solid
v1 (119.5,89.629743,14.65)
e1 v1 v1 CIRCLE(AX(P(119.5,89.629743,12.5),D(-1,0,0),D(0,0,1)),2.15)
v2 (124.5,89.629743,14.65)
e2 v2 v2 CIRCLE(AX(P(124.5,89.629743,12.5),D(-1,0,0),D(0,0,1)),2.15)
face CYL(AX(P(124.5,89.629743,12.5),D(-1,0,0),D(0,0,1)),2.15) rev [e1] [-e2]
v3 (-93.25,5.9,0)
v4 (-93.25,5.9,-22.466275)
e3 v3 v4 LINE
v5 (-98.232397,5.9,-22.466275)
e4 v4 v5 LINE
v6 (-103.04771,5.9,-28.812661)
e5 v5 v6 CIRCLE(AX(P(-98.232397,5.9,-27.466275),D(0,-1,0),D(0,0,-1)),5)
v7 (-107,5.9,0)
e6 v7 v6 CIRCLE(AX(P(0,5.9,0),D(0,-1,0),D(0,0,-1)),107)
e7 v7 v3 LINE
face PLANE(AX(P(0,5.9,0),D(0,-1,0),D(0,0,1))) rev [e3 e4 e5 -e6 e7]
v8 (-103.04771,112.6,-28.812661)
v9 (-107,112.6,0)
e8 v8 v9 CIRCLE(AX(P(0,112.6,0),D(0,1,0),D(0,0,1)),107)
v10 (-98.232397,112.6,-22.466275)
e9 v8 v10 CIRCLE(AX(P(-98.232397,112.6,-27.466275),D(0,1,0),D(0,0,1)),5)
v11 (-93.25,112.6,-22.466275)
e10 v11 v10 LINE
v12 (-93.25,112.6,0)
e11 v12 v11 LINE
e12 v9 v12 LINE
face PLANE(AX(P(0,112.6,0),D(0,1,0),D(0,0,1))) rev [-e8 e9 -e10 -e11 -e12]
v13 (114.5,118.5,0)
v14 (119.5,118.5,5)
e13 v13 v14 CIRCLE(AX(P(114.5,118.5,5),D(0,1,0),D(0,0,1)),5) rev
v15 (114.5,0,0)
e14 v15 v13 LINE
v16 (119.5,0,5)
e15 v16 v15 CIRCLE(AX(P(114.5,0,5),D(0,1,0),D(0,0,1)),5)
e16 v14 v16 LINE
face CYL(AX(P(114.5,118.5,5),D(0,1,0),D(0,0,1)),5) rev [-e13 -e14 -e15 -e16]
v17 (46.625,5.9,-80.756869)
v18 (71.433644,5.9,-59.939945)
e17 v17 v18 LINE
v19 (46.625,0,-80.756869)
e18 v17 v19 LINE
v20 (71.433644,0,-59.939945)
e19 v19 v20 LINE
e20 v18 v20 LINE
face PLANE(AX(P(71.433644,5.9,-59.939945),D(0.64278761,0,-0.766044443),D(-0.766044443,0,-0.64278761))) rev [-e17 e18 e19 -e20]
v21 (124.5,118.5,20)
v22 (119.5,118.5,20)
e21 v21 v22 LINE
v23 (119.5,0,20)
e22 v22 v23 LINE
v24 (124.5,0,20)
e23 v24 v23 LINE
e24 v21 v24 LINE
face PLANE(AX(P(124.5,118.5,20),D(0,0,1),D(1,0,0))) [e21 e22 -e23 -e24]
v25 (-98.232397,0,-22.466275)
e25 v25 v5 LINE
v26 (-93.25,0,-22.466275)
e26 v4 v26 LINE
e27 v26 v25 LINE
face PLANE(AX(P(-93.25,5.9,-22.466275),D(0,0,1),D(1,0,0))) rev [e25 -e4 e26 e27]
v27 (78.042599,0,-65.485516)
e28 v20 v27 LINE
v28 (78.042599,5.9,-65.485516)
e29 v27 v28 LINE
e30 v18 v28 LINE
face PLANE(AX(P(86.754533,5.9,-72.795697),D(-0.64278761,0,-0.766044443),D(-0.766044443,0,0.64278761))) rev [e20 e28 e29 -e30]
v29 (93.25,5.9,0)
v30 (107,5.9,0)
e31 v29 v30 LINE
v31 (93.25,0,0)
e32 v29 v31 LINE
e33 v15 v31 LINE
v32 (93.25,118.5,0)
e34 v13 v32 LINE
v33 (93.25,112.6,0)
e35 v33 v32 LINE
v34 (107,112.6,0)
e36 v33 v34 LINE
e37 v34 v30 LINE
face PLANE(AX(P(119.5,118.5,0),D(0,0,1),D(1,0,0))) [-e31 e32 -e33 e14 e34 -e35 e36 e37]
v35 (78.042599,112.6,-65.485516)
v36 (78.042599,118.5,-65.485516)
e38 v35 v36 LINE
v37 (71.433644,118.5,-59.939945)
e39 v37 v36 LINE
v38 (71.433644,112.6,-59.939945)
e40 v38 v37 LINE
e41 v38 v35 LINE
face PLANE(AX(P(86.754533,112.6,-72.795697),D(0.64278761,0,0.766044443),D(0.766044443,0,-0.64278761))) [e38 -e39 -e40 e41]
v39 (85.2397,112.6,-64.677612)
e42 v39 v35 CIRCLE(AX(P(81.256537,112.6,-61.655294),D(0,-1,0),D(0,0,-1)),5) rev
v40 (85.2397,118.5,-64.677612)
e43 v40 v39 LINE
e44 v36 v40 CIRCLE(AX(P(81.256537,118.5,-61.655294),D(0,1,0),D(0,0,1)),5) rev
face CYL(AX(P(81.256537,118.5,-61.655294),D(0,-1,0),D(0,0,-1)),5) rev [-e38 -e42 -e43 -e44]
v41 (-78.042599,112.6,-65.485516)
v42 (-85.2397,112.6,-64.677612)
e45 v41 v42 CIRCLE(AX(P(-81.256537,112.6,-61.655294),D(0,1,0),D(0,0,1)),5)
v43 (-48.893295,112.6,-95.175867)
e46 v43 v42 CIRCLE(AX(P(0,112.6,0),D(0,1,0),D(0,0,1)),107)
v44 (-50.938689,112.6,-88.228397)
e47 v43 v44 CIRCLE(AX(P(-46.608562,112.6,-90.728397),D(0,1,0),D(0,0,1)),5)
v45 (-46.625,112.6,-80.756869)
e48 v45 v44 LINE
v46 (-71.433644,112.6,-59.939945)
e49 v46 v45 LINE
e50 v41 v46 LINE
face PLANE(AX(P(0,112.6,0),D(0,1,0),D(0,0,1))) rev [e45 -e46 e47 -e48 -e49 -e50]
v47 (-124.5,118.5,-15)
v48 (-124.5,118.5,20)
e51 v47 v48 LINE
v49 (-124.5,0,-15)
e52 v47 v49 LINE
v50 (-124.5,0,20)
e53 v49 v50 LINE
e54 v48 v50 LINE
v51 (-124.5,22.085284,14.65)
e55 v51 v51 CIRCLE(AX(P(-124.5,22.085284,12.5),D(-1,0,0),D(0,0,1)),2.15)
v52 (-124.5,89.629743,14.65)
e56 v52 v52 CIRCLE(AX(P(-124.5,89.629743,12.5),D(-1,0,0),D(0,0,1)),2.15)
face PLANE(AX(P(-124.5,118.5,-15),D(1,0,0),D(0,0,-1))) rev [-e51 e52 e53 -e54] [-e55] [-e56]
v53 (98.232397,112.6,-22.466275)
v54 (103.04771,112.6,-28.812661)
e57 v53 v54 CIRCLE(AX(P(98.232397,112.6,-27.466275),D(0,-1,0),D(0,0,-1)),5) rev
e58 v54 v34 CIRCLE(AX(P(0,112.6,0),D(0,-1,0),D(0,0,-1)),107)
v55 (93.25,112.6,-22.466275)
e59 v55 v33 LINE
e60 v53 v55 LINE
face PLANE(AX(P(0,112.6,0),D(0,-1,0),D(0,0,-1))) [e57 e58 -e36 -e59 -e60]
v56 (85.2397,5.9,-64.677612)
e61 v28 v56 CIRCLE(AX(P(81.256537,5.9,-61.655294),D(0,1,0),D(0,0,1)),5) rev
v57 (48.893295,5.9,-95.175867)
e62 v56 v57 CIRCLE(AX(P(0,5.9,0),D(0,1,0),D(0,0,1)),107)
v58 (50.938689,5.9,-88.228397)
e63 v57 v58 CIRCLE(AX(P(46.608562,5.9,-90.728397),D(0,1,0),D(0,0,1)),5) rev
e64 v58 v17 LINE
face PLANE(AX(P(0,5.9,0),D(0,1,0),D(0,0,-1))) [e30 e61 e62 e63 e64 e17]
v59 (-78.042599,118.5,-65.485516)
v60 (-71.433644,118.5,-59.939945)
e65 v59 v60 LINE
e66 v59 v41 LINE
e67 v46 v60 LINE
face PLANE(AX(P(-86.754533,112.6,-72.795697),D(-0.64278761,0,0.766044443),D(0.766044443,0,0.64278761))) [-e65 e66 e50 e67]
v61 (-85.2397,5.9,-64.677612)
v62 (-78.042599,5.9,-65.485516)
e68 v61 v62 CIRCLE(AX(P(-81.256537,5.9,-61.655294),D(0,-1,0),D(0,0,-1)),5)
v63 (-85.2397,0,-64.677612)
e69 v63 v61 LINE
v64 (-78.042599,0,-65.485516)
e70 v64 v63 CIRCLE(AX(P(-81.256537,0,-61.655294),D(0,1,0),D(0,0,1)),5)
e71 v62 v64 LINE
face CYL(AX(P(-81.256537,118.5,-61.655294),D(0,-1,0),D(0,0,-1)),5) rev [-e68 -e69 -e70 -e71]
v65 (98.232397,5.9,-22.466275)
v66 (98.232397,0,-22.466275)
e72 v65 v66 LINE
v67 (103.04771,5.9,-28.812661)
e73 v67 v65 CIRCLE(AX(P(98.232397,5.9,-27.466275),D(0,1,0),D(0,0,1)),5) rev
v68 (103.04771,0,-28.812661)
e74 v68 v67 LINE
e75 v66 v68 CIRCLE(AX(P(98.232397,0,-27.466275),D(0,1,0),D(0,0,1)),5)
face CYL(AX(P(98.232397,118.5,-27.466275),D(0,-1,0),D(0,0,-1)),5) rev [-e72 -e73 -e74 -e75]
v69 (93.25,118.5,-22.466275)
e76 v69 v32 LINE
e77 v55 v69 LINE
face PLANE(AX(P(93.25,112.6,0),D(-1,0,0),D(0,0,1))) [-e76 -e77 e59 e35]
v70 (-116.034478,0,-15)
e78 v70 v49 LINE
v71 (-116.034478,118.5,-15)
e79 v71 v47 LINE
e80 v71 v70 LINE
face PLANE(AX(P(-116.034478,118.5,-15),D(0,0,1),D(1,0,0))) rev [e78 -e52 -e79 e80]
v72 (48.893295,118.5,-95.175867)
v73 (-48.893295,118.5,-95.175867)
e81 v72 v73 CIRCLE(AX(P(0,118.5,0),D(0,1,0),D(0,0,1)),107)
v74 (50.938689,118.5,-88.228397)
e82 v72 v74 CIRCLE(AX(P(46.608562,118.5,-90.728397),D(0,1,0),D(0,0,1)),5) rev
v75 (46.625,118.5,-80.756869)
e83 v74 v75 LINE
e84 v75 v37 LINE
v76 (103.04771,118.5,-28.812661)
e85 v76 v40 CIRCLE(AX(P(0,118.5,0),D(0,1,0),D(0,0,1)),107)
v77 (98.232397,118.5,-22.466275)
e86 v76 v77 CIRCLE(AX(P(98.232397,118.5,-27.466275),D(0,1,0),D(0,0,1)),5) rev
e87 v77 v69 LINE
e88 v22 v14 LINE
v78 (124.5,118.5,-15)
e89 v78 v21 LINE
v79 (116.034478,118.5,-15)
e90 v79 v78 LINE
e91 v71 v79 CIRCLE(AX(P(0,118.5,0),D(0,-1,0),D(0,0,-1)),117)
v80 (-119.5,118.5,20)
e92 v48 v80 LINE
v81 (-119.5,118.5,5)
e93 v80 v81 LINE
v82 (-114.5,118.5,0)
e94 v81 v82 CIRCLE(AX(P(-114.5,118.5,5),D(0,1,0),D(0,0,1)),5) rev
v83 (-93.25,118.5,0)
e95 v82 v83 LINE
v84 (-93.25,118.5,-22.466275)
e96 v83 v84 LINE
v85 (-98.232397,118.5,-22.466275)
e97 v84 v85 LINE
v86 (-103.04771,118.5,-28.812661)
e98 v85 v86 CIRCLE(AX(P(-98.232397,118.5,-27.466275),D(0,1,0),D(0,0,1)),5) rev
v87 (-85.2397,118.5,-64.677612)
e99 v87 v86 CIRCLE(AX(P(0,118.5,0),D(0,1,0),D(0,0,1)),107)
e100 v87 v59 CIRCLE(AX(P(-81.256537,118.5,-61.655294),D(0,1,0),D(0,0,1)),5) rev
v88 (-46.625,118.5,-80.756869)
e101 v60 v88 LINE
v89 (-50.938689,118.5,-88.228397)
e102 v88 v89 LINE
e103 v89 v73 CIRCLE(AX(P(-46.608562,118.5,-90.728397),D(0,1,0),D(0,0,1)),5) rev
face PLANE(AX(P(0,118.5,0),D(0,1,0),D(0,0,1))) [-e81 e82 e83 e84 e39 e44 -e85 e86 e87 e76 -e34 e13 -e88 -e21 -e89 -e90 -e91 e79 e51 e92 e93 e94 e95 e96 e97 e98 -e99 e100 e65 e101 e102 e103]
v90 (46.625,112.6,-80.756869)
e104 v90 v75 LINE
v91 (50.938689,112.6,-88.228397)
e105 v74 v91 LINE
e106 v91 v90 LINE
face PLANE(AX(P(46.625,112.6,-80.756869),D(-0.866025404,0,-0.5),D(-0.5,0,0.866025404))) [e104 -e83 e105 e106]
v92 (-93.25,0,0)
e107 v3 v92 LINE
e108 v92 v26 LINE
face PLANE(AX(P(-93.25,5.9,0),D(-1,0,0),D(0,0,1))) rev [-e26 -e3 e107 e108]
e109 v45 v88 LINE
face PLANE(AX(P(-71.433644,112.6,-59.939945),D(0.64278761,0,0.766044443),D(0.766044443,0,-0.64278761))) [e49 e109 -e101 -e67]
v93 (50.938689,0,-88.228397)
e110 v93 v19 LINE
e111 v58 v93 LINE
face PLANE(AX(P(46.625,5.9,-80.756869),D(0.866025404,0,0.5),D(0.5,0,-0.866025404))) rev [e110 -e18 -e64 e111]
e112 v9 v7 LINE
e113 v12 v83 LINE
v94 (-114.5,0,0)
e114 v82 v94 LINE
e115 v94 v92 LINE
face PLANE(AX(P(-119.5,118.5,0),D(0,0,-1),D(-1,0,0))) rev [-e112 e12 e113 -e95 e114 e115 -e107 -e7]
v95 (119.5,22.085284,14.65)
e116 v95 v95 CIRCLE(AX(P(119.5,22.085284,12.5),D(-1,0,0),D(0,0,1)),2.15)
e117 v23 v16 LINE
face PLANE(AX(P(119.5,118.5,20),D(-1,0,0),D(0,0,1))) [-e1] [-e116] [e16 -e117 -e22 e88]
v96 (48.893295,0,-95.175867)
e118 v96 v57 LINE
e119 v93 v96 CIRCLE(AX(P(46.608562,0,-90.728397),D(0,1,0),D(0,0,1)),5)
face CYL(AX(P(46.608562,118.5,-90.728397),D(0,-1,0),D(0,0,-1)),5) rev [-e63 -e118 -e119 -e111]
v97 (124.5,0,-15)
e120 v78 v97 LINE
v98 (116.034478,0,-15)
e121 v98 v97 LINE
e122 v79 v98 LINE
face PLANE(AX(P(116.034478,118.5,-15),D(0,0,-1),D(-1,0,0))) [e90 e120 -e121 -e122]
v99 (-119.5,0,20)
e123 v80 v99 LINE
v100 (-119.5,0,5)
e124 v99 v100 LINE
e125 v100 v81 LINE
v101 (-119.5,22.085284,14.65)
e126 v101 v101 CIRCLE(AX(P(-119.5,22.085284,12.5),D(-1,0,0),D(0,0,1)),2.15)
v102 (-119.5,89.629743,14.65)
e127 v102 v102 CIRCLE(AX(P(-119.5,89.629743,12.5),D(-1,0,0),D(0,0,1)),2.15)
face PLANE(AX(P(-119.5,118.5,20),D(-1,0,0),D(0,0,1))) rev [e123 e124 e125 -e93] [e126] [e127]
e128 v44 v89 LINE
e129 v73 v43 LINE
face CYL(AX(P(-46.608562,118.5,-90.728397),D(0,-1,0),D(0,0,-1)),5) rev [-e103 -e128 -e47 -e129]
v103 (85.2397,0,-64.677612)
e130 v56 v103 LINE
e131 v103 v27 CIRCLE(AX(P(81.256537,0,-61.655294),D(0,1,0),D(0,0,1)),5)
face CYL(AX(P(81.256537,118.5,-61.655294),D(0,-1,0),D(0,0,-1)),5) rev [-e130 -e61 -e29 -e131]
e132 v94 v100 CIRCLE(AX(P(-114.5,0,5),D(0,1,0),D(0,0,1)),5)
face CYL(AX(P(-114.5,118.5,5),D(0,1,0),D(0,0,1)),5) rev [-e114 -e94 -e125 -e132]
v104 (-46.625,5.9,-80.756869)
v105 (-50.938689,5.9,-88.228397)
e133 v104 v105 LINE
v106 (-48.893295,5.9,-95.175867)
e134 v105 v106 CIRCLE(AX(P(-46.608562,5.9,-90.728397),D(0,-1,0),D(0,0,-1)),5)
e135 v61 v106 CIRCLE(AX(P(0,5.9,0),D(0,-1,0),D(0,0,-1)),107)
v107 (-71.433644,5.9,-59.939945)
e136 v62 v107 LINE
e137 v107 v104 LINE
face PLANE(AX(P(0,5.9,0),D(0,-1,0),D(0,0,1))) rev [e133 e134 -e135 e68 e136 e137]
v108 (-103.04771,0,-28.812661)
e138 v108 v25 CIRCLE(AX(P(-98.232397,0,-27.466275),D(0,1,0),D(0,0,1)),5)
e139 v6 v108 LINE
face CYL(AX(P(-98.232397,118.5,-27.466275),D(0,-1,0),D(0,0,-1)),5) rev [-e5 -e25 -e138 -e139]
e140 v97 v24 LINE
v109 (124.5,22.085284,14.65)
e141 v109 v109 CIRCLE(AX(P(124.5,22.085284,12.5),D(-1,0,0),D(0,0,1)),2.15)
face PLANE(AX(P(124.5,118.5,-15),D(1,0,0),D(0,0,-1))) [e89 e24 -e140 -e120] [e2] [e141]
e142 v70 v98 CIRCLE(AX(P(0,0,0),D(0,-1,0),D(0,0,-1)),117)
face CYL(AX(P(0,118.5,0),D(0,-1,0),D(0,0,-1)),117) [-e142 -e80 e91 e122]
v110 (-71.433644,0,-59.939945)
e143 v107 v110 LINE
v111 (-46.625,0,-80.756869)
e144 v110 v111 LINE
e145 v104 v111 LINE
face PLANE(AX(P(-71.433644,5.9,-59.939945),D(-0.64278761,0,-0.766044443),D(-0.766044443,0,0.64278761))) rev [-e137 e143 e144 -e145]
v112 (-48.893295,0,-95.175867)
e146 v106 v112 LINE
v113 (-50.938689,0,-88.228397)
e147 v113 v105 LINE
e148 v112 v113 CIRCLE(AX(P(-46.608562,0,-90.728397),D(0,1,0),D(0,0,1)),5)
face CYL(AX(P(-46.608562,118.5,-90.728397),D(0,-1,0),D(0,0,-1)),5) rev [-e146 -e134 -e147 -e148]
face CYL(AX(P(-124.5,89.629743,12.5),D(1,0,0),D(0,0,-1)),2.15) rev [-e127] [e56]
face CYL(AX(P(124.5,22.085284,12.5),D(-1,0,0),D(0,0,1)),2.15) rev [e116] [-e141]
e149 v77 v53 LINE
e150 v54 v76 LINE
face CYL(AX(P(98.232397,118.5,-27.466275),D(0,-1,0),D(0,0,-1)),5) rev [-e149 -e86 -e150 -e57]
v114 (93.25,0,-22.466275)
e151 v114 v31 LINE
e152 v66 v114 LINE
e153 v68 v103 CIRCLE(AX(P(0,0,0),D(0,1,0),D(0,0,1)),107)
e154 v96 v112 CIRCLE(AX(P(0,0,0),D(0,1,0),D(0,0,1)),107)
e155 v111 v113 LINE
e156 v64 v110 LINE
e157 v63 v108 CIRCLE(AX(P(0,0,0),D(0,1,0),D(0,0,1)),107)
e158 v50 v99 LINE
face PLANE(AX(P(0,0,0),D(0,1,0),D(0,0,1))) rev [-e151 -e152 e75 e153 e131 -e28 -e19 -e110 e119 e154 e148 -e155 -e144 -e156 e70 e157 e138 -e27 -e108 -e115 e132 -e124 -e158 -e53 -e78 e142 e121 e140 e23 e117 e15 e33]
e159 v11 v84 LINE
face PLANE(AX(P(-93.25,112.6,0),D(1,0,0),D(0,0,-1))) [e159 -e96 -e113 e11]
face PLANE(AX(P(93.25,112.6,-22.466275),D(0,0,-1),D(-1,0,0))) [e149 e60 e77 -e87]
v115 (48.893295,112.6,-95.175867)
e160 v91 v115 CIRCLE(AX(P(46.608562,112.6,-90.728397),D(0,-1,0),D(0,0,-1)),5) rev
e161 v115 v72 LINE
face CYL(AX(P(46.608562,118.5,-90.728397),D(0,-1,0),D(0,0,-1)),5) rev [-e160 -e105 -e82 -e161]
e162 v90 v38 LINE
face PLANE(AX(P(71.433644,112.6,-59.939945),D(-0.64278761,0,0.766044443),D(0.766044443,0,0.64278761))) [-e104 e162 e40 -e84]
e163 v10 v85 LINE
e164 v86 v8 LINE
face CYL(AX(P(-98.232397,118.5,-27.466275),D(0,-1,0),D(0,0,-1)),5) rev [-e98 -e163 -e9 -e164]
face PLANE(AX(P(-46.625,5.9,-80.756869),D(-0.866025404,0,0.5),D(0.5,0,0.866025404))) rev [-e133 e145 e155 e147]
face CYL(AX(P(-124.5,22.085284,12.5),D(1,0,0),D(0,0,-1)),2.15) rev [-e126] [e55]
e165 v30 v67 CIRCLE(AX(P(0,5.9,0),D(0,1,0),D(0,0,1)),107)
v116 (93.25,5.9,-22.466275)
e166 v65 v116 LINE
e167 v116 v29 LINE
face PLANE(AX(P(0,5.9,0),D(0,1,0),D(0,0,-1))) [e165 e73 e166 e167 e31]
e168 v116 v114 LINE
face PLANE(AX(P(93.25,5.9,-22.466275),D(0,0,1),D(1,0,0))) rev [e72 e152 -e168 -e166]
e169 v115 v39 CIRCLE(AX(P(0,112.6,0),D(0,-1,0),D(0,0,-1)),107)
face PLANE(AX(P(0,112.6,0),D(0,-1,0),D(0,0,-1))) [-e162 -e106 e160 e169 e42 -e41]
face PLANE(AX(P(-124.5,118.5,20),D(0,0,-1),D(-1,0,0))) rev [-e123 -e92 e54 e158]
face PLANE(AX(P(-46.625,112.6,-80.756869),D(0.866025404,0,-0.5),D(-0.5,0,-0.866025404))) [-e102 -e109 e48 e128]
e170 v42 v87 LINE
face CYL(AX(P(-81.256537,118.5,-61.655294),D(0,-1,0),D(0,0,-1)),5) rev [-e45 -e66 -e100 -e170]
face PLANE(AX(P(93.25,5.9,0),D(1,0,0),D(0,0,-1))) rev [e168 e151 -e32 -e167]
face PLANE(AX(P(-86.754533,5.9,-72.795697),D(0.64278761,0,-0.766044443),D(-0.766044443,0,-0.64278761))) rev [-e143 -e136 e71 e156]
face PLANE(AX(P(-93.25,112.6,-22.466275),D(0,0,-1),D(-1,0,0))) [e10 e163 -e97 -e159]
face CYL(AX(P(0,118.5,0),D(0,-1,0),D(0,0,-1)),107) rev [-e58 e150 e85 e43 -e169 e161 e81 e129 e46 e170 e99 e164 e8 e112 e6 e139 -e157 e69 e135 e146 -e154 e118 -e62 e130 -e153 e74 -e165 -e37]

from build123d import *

# Parameters (mm, degrees)
BOSS_EXTRUDE1_DEPTH    = 118.5
BOSS_EXTRUDE2_DEPTH    = 5.9
FILLET1_R              = 5
CUT_EXTRUDE1_START     = -5
CUT_EXTRUDE1_OUTLINE_R = 2.15
CUT_EXTRUDE1_DEPTH     = 5


# Read off the part's stored shape, not the designer's step: Cut-Extrude1
with BuildPart() as part:
    # Sketch1 → Boss-Extrude1 (new body)
    with BuildSketch(Plane(origin=(0, 0, 0), x_dir=(1, 0, 0), z_dir=(0, 1, 0))):
        with BuildLine():
            Line((-116.034477635, 15), (-124.5, 15))
            Line((-124.5, 15), (-124.5, -20))
            Line((-124.5, -20), (-119.5, -20))
            Line((-119.5, -20), (-119.5, 0))
            Line((-119.5, 0), (-107, 0))
            ThreePointArc((-107, 0), (0, 107), (107, 0))
            Line((107, 0), (119.5, 0))
            Line((119.5, 0), (119.5, -20))
            Line((119.5, -20), (124.5, -20))
            Line((124.5, -20), (124.5, 15))
            Line((124.5, 15), (116.034477635, 15))
            ThreePointArc((116.034477635, 15), (0, 117), (-116.034477635, 15))
        make_face()
    extrude(amount=BOSS_EXTRUDE1_DEPTH)

    # Sketch2 → Boss-Extrude2 (add)
    with BuildSketch(Plane(origin=(0, 118.5, 0), x_dir=(1, 0, 0), z_dir=(0, 1, 0))):
        Polygon((-113.25, 0), (-93.25, 0), (-93.25, 22.466274611), (-110.99922975, 22.466274611), align=None)
        Polygon((-86.754533183, 72.795696797), (-71.433644321, 59.939944603), (-46.625, 80.756868903), (-56.625, 98.077376979), align=None)
        Polygon((110.99922975, 22.466274611), (113.25, 0), (93.25, 0), (93.25, 22.466274611), align=None)
        Polygon((46.625, 80.756868903), (56.625, 98.077376979), (86.754533183, 72.795696797), (71.433644321, 59.939944603), align=None)
    boss_extrude2 = extrude(amount=-BOSS_EXTRUDE2_DEPTH)

    # Mirror1: Boss-Extrude2 across plane
    add(boss_extrude2.mirror(Plane.ZX.offset(59.25)))

    # Fillet1
    fillet1_edges = [part.edges().sort_by_distance(p)[0] for p in [
        (53.5, 115.55, -92.664718205),
        (81.966755414, 115.55, -68.778274236),
        (-104.614848397, 2.95, -22.466274611),
        (104.614848397, 2.95, -22.466274611),
        (-81.966755414, 2.95, -68.778274236),
        (-53.5, 2.95, -92.664718205),
        (81.966755414, 2.95, -68.778274236),
        (53.5, 2.95, -92.664718205),
        (119.5, 59.25, 0),
        (-119.5, 59.25, 0),
        (-104.614848397, 115.55, -22.466274611),
        (104.614848397, 115.55, -22.466274611),
        (-53.5, 115.55, -92.664718205),
        (-81.966755414, 115.55, -68.778274236),
    ]]
    fillet(fillet1_edges, radius=FILLET1_R)

    # Cut-Extrude1 outline → Cut-Extrude1 (cut)
    with BuildSketch(Plane.ZY.offset(-119.5).offset(CUT_EXTRUDE1_START)):
        with Locations((12.5, 22.085284338)):
            Circle(CUT_EXTRUDE1_OUTLINE_R)
        with Locations((12.5, 89.629742653)):
            Circle(CUT_EXTRUDE1_OUTLINE_R)
    cut_extrude1 = extrude(amount=CUT_EXTRUDE1_DEPTH, mode=Mode.SUBTRACT)

    # Mirror2: Cut-Extrude1 across plane
    add(cut_extrude1.mirror(Plane(origin=(0, 0, 0), x_dir=(0, 0, 1), z_dir=(1, 0, 0))), mode=Mode.SUBTRACT)


solid = part.part
